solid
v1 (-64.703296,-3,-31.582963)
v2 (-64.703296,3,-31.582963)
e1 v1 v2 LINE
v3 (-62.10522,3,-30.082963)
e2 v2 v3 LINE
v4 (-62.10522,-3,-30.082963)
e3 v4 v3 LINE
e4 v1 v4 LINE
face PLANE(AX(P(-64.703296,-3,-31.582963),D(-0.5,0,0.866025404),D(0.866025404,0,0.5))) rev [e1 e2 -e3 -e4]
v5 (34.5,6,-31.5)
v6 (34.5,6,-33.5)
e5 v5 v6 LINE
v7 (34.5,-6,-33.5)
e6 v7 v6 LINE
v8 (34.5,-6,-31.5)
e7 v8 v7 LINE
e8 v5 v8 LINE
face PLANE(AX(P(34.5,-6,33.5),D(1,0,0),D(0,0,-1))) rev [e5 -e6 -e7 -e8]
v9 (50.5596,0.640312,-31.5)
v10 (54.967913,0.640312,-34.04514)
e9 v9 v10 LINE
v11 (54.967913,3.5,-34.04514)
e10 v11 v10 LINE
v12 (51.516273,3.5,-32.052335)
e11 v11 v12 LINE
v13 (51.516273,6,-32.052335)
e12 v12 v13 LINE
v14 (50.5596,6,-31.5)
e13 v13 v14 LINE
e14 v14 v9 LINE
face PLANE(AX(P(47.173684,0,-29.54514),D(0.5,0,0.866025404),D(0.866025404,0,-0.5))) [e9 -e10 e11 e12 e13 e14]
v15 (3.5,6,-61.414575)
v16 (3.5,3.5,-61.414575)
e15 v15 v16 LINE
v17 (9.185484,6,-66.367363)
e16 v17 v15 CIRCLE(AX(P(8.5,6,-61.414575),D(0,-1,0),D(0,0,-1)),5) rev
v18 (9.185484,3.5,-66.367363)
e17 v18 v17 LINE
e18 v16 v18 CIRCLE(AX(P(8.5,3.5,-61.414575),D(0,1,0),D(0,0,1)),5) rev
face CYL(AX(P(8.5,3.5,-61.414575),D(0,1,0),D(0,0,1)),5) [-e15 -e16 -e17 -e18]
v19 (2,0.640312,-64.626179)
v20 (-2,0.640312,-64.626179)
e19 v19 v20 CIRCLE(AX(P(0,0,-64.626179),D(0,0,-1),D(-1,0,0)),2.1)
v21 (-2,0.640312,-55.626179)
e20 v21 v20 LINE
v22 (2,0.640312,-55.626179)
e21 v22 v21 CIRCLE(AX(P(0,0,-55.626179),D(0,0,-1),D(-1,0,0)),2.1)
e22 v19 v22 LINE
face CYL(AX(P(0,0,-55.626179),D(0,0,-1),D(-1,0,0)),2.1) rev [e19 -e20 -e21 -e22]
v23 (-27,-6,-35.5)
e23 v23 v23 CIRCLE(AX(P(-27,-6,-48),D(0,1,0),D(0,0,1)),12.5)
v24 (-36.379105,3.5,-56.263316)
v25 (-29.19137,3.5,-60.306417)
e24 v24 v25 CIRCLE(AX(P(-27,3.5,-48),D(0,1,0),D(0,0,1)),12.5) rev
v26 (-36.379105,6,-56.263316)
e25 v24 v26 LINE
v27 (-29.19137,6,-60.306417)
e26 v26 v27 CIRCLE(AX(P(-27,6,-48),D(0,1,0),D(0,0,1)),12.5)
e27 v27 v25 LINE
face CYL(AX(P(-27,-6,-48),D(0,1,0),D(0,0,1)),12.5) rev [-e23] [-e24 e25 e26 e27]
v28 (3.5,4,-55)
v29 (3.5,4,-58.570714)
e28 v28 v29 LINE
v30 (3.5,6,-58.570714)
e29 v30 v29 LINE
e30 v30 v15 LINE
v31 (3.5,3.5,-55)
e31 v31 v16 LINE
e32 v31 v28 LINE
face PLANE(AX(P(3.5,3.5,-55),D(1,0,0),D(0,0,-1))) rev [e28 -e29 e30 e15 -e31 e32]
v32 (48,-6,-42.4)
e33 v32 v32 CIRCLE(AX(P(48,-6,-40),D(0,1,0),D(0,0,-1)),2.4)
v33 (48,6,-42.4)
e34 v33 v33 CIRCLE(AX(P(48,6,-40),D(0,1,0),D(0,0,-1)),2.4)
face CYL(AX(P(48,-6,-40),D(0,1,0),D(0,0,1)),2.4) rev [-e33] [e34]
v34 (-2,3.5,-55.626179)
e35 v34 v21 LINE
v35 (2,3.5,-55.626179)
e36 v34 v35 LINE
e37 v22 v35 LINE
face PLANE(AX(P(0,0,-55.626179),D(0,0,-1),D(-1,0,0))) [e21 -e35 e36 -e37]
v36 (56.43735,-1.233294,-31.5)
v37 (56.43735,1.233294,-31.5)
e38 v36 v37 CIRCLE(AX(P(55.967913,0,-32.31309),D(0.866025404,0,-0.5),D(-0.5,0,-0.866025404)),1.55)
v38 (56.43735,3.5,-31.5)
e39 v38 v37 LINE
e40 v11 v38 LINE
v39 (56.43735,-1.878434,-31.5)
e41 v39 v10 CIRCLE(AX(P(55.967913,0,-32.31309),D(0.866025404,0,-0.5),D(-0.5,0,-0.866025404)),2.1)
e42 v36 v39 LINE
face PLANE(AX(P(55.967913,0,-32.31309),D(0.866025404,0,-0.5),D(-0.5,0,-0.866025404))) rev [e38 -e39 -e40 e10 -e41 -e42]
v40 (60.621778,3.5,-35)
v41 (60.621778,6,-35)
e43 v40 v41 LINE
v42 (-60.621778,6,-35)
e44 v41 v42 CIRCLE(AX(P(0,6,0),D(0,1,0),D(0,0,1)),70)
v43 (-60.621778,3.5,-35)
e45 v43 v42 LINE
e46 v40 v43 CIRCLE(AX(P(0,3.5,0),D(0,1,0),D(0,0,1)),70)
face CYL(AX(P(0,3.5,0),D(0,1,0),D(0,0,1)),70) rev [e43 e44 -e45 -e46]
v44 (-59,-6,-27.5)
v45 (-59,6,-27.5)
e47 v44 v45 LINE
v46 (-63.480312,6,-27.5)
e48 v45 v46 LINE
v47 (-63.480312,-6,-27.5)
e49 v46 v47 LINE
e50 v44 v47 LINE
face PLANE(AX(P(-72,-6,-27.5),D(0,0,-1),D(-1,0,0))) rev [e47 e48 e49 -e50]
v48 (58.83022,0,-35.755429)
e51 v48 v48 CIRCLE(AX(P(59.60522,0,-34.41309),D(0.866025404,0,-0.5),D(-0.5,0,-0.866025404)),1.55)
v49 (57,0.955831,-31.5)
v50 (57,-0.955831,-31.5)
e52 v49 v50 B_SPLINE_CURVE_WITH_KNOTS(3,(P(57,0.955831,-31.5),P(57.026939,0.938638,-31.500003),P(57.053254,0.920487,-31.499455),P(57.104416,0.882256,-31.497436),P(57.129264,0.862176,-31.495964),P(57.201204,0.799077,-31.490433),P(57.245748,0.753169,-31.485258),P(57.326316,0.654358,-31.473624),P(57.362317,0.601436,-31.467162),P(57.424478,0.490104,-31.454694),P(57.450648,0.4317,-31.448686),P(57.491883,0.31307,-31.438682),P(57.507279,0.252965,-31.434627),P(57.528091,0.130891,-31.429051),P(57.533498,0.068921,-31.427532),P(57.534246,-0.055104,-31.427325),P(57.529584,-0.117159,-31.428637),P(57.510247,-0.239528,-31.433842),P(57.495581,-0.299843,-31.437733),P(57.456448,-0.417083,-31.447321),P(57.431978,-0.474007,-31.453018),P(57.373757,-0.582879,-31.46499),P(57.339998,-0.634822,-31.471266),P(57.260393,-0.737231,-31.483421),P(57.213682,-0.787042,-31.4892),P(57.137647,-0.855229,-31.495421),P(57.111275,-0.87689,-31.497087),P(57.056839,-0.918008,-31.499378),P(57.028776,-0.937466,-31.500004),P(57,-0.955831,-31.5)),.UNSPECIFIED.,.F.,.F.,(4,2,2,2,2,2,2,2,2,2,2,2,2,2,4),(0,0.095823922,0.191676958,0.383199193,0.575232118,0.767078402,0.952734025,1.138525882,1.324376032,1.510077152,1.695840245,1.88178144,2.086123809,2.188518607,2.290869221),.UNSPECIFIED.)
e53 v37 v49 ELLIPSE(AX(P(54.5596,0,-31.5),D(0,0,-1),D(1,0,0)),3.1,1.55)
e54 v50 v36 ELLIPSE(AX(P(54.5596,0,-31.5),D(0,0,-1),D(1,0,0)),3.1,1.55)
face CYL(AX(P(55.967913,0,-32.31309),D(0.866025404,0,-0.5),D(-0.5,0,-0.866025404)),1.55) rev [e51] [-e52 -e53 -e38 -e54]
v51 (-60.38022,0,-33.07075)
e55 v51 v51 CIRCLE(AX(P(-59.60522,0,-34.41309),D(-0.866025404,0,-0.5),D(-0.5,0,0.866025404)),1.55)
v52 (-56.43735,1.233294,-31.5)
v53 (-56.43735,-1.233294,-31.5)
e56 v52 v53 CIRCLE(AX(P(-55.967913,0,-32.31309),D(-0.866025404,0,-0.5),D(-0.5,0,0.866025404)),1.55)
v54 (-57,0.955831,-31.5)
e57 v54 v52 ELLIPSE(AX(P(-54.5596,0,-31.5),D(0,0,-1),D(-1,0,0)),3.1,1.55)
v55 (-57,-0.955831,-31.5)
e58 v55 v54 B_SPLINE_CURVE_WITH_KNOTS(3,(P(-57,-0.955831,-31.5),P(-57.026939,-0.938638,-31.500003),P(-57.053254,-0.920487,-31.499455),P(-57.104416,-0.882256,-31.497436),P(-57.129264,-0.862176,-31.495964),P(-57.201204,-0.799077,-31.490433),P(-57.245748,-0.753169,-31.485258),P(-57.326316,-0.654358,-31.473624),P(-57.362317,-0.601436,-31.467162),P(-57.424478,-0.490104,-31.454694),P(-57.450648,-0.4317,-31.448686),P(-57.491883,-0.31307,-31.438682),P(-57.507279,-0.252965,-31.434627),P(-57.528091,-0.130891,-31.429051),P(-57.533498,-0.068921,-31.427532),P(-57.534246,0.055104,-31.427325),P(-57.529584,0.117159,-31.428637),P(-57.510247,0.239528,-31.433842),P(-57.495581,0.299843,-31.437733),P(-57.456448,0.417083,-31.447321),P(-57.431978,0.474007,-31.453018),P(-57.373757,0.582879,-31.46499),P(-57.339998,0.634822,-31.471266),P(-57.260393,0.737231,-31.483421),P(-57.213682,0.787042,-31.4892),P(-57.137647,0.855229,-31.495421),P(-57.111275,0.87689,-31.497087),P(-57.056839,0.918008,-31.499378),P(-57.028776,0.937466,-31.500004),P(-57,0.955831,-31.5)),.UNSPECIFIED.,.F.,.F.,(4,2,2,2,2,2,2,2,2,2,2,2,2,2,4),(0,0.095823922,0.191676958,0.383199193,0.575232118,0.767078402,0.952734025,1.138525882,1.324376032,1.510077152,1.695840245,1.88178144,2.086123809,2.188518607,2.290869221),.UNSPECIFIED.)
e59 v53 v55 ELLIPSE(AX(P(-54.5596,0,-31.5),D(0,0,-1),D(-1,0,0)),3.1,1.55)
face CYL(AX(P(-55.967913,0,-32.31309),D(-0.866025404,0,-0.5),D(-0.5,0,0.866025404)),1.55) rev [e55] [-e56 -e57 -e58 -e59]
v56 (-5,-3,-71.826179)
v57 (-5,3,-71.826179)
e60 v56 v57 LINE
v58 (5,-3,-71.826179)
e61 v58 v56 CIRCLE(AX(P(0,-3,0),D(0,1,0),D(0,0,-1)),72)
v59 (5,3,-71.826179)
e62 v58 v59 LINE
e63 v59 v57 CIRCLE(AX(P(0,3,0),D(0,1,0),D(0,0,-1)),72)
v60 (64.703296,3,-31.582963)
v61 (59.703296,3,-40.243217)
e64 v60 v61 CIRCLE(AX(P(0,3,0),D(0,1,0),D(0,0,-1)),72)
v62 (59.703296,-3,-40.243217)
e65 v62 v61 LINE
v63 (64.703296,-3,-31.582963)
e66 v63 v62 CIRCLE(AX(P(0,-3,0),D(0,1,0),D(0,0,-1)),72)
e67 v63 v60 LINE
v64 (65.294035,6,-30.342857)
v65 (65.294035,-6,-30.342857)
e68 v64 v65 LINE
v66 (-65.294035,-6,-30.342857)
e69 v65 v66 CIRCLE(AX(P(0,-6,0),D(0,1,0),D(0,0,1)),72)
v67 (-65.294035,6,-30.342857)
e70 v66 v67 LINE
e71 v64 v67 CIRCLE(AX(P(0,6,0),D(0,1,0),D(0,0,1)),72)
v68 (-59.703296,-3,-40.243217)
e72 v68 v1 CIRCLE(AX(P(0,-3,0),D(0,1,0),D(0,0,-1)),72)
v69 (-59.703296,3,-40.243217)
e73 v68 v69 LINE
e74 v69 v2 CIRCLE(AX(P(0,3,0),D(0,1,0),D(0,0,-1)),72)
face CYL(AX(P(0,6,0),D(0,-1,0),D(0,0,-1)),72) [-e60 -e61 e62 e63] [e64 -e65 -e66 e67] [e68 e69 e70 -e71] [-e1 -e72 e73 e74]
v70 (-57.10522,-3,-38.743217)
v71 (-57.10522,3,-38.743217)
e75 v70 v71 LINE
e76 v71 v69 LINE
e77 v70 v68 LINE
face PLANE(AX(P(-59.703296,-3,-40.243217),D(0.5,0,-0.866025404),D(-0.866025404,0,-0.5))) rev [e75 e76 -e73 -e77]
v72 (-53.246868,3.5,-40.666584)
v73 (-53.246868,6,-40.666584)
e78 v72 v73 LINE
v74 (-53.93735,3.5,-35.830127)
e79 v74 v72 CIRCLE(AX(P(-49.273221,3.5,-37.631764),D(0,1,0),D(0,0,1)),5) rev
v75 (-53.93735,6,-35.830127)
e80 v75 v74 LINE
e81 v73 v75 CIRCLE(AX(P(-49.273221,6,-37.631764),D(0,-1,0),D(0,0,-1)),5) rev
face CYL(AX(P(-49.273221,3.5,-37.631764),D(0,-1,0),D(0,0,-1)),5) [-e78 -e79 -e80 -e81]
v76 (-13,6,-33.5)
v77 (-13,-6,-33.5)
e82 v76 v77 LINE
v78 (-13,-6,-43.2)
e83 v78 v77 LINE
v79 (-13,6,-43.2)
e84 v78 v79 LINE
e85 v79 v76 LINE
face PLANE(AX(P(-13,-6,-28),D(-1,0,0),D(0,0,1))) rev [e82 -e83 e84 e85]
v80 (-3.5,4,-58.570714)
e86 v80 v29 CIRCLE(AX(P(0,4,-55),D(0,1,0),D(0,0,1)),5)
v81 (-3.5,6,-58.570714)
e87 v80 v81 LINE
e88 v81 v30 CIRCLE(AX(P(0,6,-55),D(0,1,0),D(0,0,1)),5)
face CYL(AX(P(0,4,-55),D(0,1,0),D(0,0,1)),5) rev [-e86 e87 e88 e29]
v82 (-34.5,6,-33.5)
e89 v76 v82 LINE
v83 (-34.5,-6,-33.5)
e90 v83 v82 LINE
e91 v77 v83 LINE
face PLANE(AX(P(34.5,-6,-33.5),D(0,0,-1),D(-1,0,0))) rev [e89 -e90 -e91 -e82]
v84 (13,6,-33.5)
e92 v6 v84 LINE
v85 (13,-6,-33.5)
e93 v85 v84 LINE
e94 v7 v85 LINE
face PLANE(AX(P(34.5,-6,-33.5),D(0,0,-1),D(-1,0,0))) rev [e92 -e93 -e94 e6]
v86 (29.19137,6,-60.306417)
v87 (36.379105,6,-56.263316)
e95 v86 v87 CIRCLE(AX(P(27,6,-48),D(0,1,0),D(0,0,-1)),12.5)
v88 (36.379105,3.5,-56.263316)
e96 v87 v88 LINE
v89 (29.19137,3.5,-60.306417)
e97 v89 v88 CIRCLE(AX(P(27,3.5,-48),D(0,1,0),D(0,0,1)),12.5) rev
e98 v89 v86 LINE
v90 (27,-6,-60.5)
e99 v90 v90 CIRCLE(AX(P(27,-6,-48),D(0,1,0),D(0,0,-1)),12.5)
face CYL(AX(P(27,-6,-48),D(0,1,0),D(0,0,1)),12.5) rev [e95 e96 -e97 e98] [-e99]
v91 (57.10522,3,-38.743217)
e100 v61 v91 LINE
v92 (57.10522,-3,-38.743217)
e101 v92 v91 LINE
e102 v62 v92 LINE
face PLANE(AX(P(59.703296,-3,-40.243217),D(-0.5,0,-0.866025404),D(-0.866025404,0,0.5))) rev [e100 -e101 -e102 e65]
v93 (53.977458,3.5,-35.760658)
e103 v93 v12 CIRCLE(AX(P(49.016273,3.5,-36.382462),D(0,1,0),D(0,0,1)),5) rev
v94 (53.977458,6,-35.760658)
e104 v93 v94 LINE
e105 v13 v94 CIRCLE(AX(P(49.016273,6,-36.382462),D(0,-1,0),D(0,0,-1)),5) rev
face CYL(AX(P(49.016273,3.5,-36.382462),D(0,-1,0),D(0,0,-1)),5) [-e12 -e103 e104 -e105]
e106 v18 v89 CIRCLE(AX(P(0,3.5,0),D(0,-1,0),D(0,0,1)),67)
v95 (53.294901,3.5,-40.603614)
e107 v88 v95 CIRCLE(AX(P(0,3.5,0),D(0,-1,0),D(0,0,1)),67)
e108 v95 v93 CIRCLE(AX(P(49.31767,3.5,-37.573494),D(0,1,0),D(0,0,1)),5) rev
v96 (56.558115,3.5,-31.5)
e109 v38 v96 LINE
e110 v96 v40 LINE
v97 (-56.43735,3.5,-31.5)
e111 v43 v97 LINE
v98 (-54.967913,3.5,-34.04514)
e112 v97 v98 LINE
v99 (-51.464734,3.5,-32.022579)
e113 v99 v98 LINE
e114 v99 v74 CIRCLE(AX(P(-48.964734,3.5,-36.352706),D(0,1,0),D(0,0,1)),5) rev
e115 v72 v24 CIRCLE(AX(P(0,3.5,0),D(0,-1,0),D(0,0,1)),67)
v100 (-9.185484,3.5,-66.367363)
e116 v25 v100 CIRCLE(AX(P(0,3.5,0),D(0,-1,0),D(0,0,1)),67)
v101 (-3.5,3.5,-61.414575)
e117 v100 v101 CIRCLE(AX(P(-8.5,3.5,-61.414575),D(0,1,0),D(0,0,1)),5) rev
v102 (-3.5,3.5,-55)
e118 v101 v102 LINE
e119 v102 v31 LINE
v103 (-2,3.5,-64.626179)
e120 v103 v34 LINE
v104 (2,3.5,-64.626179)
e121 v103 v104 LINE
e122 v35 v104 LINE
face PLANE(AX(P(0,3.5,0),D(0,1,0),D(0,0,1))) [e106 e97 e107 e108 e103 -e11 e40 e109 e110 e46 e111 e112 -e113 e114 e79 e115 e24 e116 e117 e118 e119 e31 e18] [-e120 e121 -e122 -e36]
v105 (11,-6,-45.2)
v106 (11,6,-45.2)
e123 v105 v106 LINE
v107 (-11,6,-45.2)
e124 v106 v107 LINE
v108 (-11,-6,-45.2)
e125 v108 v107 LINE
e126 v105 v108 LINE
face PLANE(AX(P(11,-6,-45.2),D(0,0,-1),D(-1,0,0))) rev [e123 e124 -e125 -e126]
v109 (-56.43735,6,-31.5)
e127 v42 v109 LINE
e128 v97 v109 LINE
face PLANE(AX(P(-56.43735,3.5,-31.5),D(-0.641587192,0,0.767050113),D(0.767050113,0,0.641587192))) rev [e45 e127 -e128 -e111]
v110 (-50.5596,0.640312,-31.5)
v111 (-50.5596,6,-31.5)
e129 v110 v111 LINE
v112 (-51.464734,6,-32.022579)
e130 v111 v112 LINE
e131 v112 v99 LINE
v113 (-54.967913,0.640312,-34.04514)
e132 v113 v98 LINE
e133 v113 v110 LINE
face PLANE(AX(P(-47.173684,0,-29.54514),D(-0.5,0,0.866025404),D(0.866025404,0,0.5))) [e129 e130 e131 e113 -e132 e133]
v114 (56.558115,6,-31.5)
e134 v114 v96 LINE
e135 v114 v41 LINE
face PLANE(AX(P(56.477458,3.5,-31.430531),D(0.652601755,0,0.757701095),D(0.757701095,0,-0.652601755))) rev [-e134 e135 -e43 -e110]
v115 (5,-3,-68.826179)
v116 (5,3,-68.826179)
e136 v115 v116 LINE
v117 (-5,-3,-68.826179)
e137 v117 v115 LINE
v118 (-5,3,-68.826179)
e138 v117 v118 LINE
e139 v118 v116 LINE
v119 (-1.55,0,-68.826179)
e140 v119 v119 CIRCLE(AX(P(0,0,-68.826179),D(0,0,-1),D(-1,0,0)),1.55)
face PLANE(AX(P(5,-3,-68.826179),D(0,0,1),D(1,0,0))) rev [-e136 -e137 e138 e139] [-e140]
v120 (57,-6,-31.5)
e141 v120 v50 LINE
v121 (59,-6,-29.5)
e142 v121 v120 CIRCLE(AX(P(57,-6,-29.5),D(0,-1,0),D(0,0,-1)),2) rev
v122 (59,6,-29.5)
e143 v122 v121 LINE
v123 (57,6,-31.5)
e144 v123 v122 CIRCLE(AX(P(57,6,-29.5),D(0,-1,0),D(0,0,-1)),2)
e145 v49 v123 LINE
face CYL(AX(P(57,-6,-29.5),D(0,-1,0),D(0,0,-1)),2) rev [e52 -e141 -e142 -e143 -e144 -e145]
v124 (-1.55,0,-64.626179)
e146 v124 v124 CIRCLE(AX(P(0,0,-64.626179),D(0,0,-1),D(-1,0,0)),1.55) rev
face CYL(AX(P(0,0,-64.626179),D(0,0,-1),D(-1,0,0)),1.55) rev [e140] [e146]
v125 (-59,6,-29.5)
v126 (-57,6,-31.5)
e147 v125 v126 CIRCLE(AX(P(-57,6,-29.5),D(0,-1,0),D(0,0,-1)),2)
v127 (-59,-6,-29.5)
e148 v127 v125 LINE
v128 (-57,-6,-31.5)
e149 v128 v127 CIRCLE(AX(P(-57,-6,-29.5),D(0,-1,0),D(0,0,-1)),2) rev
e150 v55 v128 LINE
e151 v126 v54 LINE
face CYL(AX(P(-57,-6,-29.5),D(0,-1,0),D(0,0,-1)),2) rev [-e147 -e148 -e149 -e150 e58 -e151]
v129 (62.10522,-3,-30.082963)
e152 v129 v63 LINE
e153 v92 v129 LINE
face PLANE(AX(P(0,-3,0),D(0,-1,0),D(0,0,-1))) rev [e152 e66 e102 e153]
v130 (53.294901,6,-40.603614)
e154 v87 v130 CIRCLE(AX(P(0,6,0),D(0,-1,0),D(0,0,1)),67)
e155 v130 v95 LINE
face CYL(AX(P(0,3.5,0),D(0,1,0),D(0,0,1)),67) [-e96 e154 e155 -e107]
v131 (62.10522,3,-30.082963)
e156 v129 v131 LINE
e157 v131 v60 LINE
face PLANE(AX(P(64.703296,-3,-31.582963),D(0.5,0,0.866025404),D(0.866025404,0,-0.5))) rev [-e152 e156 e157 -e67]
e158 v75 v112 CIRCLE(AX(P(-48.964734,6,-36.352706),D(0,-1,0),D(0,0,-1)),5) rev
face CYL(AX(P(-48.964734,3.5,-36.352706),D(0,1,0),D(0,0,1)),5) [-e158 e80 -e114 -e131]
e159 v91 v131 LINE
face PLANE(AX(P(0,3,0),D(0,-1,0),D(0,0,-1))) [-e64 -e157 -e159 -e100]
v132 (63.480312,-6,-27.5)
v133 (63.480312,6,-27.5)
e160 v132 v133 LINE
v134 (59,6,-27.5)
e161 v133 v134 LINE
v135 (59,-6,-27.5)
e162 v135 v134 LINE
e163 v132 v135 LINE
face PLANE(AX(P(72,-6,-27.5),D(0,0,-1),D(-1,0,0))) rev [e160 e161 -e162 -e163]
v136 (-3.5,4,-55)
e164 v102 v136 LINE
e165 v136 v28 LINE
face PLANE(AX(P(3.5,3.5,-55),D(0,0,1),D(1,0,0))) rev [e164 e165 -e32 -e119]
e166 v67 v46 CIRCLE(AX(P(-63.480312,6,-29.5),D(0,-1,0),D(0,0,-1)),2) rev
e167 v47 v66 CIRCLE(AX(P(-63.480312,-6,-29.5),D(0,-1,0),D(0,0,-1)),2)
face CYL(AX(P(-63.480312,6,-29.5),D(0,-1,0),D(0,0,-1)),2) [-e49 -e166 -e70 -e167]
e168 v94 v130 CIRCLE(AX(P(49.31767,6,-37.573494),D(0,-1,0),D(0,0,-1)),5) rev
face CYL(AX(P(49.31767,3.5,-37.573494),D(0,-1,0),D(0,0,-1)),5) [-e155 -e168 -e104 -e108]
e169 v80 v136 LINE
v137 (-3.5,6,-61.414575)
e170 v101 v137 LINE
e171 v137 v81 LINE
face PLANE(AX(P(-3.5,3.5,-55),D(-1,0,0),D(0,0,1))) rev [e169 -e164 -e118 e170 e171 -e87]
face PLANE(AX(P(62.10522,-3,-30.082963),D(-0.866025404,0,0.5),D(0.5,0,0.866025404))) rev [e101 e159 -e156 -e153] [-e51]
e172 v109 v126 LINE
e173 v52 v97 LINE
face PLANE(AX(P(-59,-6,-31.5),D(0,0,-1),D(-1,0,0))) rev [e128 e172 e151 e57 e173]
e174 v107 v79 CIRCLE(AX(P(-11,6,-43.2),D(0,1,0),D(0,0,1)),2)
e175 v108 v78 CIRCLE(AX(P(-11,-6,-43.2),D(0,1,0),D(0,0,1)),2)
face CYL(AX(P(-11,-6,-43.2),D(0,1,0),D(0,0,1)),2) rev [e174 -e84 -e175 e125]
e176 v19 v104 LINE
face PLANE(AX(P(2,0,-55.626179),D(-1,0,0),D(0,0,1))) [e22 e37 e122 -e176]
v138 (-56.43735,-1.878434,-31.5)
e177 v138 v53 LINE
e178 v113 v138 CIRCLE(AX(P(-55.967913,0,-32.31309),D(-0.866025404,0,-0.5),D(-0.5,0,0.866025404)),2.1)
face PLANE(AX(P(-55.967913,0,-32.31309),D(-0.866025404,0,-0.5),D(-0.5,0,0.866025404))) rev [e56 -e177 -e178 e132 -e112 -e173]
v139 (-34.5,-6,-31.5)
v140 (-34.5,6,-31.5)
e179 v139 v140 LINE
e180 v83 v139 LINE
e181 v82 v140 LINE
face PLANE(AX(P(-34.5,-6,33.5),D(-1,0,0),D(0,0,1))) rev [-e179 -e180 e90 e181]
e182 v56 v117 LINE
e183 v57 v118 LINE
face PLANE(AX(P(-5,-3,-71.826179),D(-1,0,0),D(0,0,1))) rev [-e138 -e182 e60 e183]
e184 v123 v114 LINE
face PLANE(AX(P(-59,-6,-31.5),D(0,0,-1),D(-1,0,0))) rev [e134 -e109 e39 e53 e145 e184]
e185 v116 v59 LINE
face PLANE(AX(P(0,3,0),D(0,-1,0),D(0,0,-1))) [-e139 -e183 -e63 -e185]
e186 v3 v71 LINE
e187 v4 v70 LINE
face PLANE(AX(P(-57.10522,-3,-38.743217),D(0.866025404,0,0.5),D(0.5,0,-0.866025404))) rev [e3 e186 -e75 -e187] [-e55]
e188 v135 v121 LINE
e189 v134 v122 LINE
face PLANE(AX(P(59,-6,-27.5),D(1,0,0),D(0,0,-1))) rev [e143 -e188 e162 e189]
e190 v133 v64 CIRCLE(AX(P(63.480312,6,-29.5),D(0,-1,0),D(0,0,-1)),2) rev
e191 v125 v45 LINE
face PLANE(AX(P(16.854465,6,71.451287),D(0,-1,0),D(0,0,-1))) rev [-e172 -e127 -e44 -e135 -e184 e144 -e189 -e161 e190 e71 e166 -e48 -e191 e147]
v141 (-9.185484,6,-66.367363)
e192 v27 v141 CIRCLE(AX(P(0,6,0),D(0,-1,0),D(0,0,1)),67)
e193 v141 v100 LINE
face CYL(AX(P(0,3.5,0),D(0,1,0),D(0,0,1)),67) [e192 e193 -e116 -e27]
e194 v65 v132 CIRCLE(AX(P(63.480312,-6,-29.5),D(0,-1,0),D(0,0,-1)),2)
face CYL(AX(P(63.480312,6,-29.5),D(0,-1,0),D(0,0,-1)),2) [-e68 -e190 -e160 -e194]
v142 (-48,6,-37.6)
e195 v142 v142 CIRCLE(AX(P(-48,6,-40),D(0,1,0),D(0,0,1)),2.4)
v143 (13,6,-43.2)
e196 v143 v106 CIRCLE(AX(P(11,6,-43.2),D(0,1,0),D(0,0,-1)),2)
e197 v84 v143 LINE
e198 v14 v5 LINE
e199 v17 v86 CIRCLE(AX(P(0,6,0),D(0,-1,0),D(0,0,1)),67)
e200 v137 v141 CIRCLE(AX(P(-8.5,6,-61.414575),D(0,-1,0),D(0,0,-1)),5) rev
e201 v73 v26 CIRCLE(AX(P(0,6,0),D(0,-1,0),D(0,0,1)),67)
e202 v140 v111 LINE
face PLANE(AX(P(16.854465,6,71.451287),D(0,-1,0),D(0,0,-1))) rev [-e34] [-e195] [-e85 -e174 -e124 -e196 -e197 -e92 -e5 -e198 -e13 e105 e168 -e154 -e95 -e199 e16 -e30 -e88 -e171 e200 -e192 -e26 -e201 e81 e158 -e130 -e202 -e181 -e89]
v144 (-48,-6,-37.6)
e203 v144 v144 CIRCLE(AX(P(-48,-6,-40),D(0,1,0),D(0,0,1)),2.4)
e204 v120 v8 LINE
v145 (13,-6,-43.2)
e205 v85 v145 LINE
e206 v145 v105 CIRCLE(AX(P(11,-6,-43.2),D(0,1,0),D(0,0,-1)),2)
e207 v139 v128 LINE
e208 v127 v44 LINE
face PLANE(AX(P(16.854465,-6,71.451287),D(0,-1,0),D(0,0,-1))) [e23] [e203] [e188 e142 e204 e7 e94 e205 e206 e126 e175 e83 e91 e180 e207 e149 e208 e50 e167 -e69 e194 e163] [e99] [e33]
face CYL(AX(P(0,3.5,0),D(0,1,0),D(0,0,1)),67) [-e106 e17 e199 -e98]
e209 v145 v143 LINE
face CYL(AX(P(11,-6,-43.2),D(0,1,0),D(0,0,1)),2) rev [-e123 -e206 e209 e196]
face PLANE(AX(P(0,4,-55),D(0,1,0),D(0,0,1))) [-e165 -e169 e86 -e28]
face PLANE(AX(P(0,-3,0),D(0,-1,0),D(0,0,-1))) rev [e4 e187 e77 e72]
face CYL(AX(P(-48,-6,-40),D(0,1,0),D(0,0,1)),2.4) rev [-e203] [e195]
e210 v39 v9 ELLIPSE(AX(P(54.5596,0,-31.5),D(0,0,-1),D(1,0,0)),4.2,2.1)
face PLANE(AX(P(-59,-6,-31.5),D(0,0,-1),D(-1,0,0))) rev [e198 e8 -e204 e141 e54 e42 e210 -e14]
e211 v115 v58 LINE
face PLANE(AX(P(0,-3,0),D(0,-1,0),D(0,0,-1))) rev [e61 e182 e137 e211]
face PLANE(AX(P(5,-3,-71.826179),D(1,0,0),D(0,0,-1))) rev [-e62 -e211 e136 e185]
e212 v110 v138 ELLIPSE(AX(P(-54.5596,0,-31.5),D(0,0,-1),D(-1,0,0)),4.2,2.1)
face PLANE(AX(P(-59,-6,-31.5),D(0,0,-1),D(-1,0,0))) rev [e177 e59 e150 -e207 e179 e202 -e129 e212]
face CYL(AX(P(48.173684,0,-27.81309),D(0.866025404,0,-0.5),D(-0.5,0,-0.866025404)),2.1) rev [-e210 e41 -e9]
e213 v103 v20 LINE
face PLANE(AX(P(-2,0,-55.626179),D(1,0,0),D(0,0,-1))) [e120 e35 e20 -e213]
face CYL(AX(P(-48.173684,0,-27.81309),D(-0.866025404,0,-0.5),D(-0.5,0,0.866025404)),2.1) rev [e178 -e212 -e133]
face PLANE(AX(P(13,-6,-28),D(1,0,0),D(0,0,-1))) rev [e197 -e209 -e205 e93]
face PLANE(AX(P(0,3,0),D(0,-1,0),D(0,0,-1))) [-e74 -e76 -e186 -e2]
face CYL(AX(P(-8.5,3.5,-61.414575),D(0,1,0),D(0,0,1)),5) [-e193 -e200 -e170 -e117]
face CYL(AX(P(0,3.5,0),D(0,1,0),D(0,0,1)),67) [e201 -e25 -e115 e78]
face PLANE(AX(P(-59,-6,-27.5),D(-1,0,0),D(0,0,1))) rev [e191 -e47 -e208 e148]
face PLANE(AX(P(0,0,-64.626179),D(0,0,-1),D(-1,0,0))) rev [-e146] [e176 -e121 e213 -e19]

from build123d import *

# Parameters (mm, degrees)
BOSS_EXTRUDE1_DEPTH  = 6
SOLENOID_PLACEMENT_W = 38
SOLENOID_PLACEMENT_H = 64
CUT_EXTRUDE1_DEPTH   = 103.528044944
CUT_EXTRUDE4_DEPTH   = 103.528044944
SKETCH5_R            = 12.5
CUT_EXTRUDE5_DEPTH   = 103.528044944
SKETCH6_R            = 2.4
CUT_EXTRUDE6_DEPTH   = 103.528044944
CUT_EXTRUDE3_DEPTH   = 103.528044944
FILLET1_R            = 2
CUT_EXTRUDE7_DEPTH   = 3
SKETCH10_R           = 5
CUT_EXTRUDE9_DEPTH   = 2
SKETCH11_W           = 69
SKETCH11_H           = 67
CUT_EXTRUDE10_DEPTH  = 99.059529102
SKETCH13_R           = 1.55
CUT_EXTRUDE11_DEPTH  = 4.2
SKETCH14_R           = 2.1
CUT_EXTRUDE12_DEPTH  = 9
SKETCH15_W           = 4
SKETCH15_H           = 10.882727098
CUT_EXTRUDE13_DEPTH  = 9
CIRPATTERN1_COUNT    = 3
CIRPATTERN1_ANGLE    = 120
CUT_EXTRUDE14_DEPTH  = 2.5
FILLET2_R            = 5


with BuildPart() as part:
    # Sketch1 → Boss-Extrude1 (new, symmetric)
    with BuildSketch(Plane(origin=(0, 0, 0), x_dir=(1, 0, 0), z_dir=(0, 1, 0))):
        with BuildLine():
            ThreePointArc((36.224522061, -62.223661106), (0, 72), (-36.224522061, -62.223661106))
            ThreePointArc((-36.224522061, -62.223661106), (-32.797800029, -62.818856853), (-29.811944095, -61.035223988))
            ThreePointArc((-29.811944095, -61.035223988), (0, -46.75), (29.811944095, -61.035223988))
            ThreePointArc((29.811944095, -61.035223988), (32.797800029, -62.818856853), (36.224522061, -62.223661106))
        make_face()
    extrude(amount=BOSS_EXTRUDE1_DEPTH, both=True)

    # solenoid placement → Cut-Extrude1 (cut, through all)
    with BuildSketch(Plane(origin=(0, 6, 0), x_dir=(1, 0, 0), z_dir=(0, 1, 0))):
        with Locations((0, -4)):
            Rectangle(SOLENOID_PLACEMENT_W, SOLENOID_PLACEMENT_H)
    extrude(amount=-CUT_EXTRUDE1_DEPTH, mode=Mode.SUBTRACT)

    # Sketch4 → Cut-Extrude4 (cut, through all)
    with BuildSketch(Plane(origin=(0, 6, 0), x_dir=(1, 0, 0), z_dir=(0, 1, 0))):
        with BuildLine():
            Line((-13, 28), (13, 28))
            Line((13, 28), (13, 43.2))
            ThreePointArc((13, 43.2), (12.414213562, 44.614213562), (11, 45.2))
            Line((11, 45.2), (-11, 45.2))
            ThreePointArc((-11, 45.2), (-12.414213562, 44.614213562), (-13, 43.2))
            Line((-13, 43.2), (-13, 28))
        make_face()
    extrude(amount=-CUT_EXTRUDE4_DEPTH, mode=Mode.SUBTRACT)

    # Sketch5 → Cut-Extrude5 (cut, through all)
    with BuildSketch(Plane(origin=(0, 6, 0), x_dir=(1, 0, 0), z_dir=(0, 1, 0))):
        with Locations(Location((27, 48, 0), (0, 0, 90))):
            Circle(SKETCH5_R)
        with Locations(Location((-27, 48, 0), (0, 0, 270))):
            Circle(SKETCH5_R)
    extrude(amount=-CUT_EXTRUDE5_DEPTH, mode=Mode.SUBTRACT)

    # Sketch6 → Cut-Extrude6 (cut, through all)
    with BuildSketch(Plane(origin=(0, 6, 0), x_dir=(1, 0, 0), z_dir=(0, 1, 0))):
        with Locations(Location((48, 40, 0), (0, 0, 90))):
            Circle(SKETCH6_R)
        with Locations(Location((-48, 40, 0), (0, 0, 270))):
            Circle(SKETCH6_R)
    extrude(amount=-CUT_EXTRUDE6_DEPTH, mode=Mode.SUBTRACT)

    # Sketch3 → Cut-Extrude3 (cut, through all)
    with BuildSketch(Plane(origin=(0, 6, 0), x_dir=(1, 0, 0), z_dir=(0, 1, 0))):
        Polygon((-72, -31.5), (-72, 27.5), (-59, 27.5), (-59, 31.5), (0, 31.5), (59, 31.5), (59, 27.5), (72, 27.5), (72, -31.5), (72, -101.646422462), (-72, -101.646422462), align=None)
    extrude(amount=-CUT_EXTRUDE3_DEPTH, mode=Mode.SUBTRACT)

    # Fillet1
    fillet1_edges = [part.edges().sort_by_distance(p)[0] for p in [
        (-66.541340534, 0, -27.5),
        (66.541340534, 0, -27.5),
        (-59, 0, -31.5),
        (59, 0, -31.5),
    ]]
    fillet(fillet1_edges, radius=FILLET1_R)

    # Sketch8 → Cut-Extrude7 (cut, symmetric)
    with BuildSketch(Plane(origin=(0, 0, 0), x_dir=(1, 0, 0), z_dir=(0, 1, 0))):
        with BuildLine():
            Line((5, 71.826179071), (5, 68.826179071))
            Line((5, 68.826179071), (-5, 68.826179071))
            Line((-5, 68.826179071), (-5, 71.826179071))
            ThreePointArc((-5, 71.826179071), (0, 72), (5, 71.826179071))
        make_face()
        with BuildLine():
            Line((64.703295733, 31.582962517), (62.105219521, 30.082962517))
            Line((62.105219521, 30.082962517), (57.105219521, 38.743216555))
            Line((57.105219521, 38.743216555), (59.703295733, 40.243216555))
            ThreePointArc((59.703295733, 40.243216555), (62.353829072, 36), (64.703295733, 31.582962517))
        make_face()
        with BuildLine():
            Line((-59.703295733, 40.243216555), (-57.105219521, 38.743216555))
            Line((-57.105219521, 38.743216555), (-62.105219521, 30.082962517))
            Line((-62.105219521, 30.082962517), (-64.703295733, 31.582962517))
            ThreePointArc((-64.703295733, 31.582962517), (-62.353829072, 36), (-59.703295733, 40.243216555))
        make_face()
    extrude(amount=CUT_EXTRUDE7_DEPTH, both=True, mode=Mode.SUBTRACT)

    # Sketch10 → Cut-Extrude9 (cut)
    with BuildSketch(Plane(origin=(0, 6, 0), x_dir=(1, 0, 0), z_dir=(0, 1, 0))):
        with Locations(Location((0, 55, 0), (0, 0, 270))):
            Circle(SKETCH10_R)
    extrude(amount=-CUT_EXTRUDE9_DEPTH, mode=Mode.SUBTRACT)

    # Sketch11 → Cut-Extrude10 (cut, through all)
    with BuildSketch(Plane(origin=(0, 6, 0), x_dir=(1, 0, 0), z_dir=(0, 1, 0))):
        Rectangle(SKETCH11_W, SKETCH11_H)
    extrude(amount=-CUT_EXTRUDE10_DEPTH, mode=Mode.SUBTRACT)

    # Sketch13 → Cut-Extrude11 (cut)
    with BuildSketch(Plane(origin=(-59.605219521, 0, -34.413089536), x_dir=(-0.5000000000000001, 0, 0.8660254037844386), z_dir=(-0.8660254037844386, 0, -0.5000000000000001))):
        Circle(SKETCH13_R)
    cut_extrude11 = extrude(amount=-CUT_EXTRUDE11_DEPTH, mode=Mode.SUBTRACT)

    # Sketch14 → Cut-Extrude12 (cut)
    with BuildSketch(Plane(origin=(-55.967912825, 0, -32.313089536), x_dir=(-0.5000000000000001, 0, 0.8660254037844386), z_dir=(-0.8660254037844386, 0, -0.5000000000000001))):
        Circle(SKETCH14_R)
    cut_extrude12 = extrude(amount=-CUT_EXTRUDE12_DEPTH, mode=Mode.SUBTRACT)

    # Sketch15 → Cut-Extrude13 (cut)
    with BuildSketch(Plane(origin=(-55.967912825, 0, -32.313089536), x_dir=(0.5000000000000001, 0, -0.8660254037844386), z_dir=(0.8660254037844386, 0, 0.5000000000000001))):
        with Locations((0, 5.441363549)):
            Rectangle(SKETCH15_W, SKETCH15_H)
    cut_extrude13 = extrude(amount=CUT_EXTRUDE13_DEPTH, mode=Mode.SUBTRACT)

    # CirPattern1: Cut-Extrude11, Cut-Extrude12, Cut-Extrude13 ×3 about axis
    cirpattern1_axis = Axis((0, 0, 0), (0, -1, 0))
    add([cut_extrude11.rotate(cirpattern1_axis, i * CIRPATTERN1_ANGLE / (CIRPATTERN1_COUNT - 1)) for i in range(1, CIRPATTERN1_COUNT)], mode=Mode.SUBTRACT)
    add([cut_extrude12.rotate(cirpattern1_axis, i * CIRPATTERN1_ANGLE / (CIRPATTERN1_COUNT - 1)) for i in range(1, CIRPATTERN1_COUNT)], mode=Mode.SUBTRACT)
    add([cut_extrude13.rotate(cirpattern1_axis, i * CIRPATTERN1_ANGLE / (CIRPATTERN1_COUNT - 1)) for i in range(1, CIRPATTERN1_COUNT)], mode=Mode.SUBTRACT)

    # Sketch16 → Cut-Extrude14 (cut)
    with BuildSketch(Plane(origin=(0, 6, 0), x_dir=(1, 0, 0), z_dir=(0, 1, 0))):
        with BuildLine():
            Line((-56.437350288, 31.5), (-60.621778265, 35))
            ThreePointArc((-60.621778265, 35), (0, 70), (60.621778265, 35))
            Line((60.621778265, 35), (56.477458213, 31.430531036))
            Line((56.477458213, 31.430531036), (53.977458213, 35.760658055))
            Line((53.977458213, 35.760658055), (55.69643641, 37.241199916))
            ThreePointArc((55.69643641, 37.241199916), (33.107279951, 58.248673927), (3.5, 66.908519637))
            Line((3.5, 66.908519637), (3.5, 55))
            Line((3.5, 55), (-3.5, 55))
            Line((-3.5, 55), (-3.5, 66.908519637))
            ThreePointArc((-3.5, 66.908519637), (-33.087061005, 58.260161295), (-55.670571638, 37.279853185))
            Line((-55.670571638, 37.279853185), (-53.937350288, 35.830127019))
            Line((-53.937350288, 35.830127019), (-56.437350288, 31.5))
        make_face()
    extrude(amount=-CUT_EXTRUDE14_DEPTH, mode=Mode.SUBTRACT)

    # Fillet2
    # the kernel refuses this fillet: 5 mm, written as the material it takes off along each edge
    with BuildSketch(Plane(origin=(55.69643641, 16.329932335, -37.241199916), x_dir=(-0.5812078308679164, 0, -0.8137551581021232), z_dir=(0, -1, 0))) as fillet2_piece_1:
        with BuildLine():
            CenterArc((3.97779484, -4.997622346), FILLET2_R, 88.232969076, 58.560507528)
            Line((-0.205714987, -2.259329899), (-0.289385184, -2.20456405))
            ThreePointArc((-0.289385184, -2.20456405), (-0.202445536, -1.120597326), (-0.099588042, 0.009067624))
            Line((-0.099588042, 0.009067624), (-0.003083562, 0.099952447))
            ThreePointArc((-0.003083562, 0.099952447), (2.065986467, 0.131860561), (4.135056496, 0.099952447))
            Line((4.135056496, 0.099952447), (4.131972934, 0))
        make_face()
    extrude(amount=12.829932335, mode=Mode.SUBTRACT)
    with BuildSketch(Plane(origin=(-3.5, 20.277950053, -66.908519637), x_dir=(-0.9955007283712978, 0, 0.09475389074975102), z_dir=(0, -1, 0))) as fillet2_piece_2:
        with BuildLine():
            CenterArc((5.498076289, -4.995456616), FILLET2_R, 87.557271181, 97.879883712)
            Line((0.520572647, -5.469226069), (0.421022574, -5.478701459))
            Line((0.421022574, -5.478701459), (-0.099550073, -0.009475389))
            Line((-0.099550073, -0.009475389), (-0.004262075, 0.099909132))
            ThreePointArc((-0.004262075, 0.099909132), (2.855590011, 0.16088135), (5.715442096, 0.099909132))
            Line((5.715442096, 0.099909132), (5.711180021, 0))
        make_face()
    extrude(amount=16.777950053, mode=Mode.SUBTRACT)
    with BuildSketch(Plane(origin=(3.5, 20.277950053, -66.908519637), x_dir=(0.9955007283712978, 0, 0.09475389074975099), z_dir=(0, -1, 0))) as fillet2_piece_3:
        with BuildLine():
            CenterArc((5.498076289, 4.995456616), FILLET2_R, 174.562845107, 97.879883712)
            Line((0.520572647, 5.469226069), (0.421022574, 5.478701459))
            Line((0.421022574, 5.478701459), (-0.099550073, 0.009475389))
            Line((-0.099550073, 0.009475389), (-0.004262075, -0.099909132))
            ThreePointArc((-0.004262075, -0.099909132), (2.855590011, -0.16088135), (5.715442096, -0.099909132))
            Line((5.715442096, -0.099909132), (5.711180021, 0))
        make_face()
    extrude(amount=16.777950053, mode=Mode.SUBTRACT)
    with BuildSketch(Plane(origin=(-55.670571638, 16.411618265, -37.279853185), x_dir=(0.581970971434149, 0, -0.8132095599585589), z_dir=(0, -1, 0))) as fillet2_piece_4:
        with BuildLine():
            CenterArc((4.009250019, 4.997584585), FILLET2_R, 213.290400287, 58.490608258)
            Line((-0.170246664, 2.253170717), (-0.253836598, 2.198282439))
            ThreePointArc((-0.253836598, 2.198282439), (-0.184839093, 1.119050965), (-0.099715761, -0.007534394))
            Line((-0.099715761, -0.007534394), (-0.003107946, -0.099951692))
            ThreePointArc((-0.003107946, -0.099951692), (2.082323653, -0.132366563), (4.167755252, -0.099951692))
            Line((4.167755252, -0.099951692), (4.164647306, 0))
        make_face()
    extrude(amount=12.911618265, mode=Mode.SUBTRACT)
    with BuildSketch(Plane(origin=(54.967912825, 15.964026198, -34.045140343), x_dir=(-0.8660254037844403, 0, 0.4999999999999973), z_dir=(0, -1, 0))) as fillet2_piece_5:
        with BuildLine():
            CenterArc((3.985610479, 5), FILLET2_R, 217.143845078, 52.856154922)
            Line((0, 1.980909225), (-0.07971221, 1.92052741))
            ThreePointArc((-0.07971221, 1.92052741), (-0.1, 0.990454613), (-0.1, 0))
            Line((-0.1, 0), (0, -0.1))
            Line((0, -0.1), (3.985610479, -0.1))
            Line((3.985610479, -0.1), (3.985610479, 0))
        make_face()
    extrude(amount=12.464026198, mode=Mode.SUBTRACT)
    with BuildSketch(Plane(origin=(-54.967912825, 3.5, -34.045140343), x_dir=(0.8660254037844386, 0, 0.5), z_dir=(0, 1, 0))) as fillet2_piece_6:
        with BuildLine():
            CenterArc((4.04512227, 5), FILLET2_R, 215.999272853, 54.000727147)
            Line((0, 2.061125075), (-0.080902445, 2.002347577))
            ThreePointArc((-0.080902445, 2.002347577), (-0.1, 1.030562538), (-0.1, 0))
            Line((-0.1, 0), (0, -0.1))
            Line((0, -0.1), (4.04512227, -0.1))
            Line((4.04512227, -0.1), (4.04512227, 0))
        make_face()
    extrude(amount=12.612805674, mode=Mode.SUBTRACT)


solid = part.part
